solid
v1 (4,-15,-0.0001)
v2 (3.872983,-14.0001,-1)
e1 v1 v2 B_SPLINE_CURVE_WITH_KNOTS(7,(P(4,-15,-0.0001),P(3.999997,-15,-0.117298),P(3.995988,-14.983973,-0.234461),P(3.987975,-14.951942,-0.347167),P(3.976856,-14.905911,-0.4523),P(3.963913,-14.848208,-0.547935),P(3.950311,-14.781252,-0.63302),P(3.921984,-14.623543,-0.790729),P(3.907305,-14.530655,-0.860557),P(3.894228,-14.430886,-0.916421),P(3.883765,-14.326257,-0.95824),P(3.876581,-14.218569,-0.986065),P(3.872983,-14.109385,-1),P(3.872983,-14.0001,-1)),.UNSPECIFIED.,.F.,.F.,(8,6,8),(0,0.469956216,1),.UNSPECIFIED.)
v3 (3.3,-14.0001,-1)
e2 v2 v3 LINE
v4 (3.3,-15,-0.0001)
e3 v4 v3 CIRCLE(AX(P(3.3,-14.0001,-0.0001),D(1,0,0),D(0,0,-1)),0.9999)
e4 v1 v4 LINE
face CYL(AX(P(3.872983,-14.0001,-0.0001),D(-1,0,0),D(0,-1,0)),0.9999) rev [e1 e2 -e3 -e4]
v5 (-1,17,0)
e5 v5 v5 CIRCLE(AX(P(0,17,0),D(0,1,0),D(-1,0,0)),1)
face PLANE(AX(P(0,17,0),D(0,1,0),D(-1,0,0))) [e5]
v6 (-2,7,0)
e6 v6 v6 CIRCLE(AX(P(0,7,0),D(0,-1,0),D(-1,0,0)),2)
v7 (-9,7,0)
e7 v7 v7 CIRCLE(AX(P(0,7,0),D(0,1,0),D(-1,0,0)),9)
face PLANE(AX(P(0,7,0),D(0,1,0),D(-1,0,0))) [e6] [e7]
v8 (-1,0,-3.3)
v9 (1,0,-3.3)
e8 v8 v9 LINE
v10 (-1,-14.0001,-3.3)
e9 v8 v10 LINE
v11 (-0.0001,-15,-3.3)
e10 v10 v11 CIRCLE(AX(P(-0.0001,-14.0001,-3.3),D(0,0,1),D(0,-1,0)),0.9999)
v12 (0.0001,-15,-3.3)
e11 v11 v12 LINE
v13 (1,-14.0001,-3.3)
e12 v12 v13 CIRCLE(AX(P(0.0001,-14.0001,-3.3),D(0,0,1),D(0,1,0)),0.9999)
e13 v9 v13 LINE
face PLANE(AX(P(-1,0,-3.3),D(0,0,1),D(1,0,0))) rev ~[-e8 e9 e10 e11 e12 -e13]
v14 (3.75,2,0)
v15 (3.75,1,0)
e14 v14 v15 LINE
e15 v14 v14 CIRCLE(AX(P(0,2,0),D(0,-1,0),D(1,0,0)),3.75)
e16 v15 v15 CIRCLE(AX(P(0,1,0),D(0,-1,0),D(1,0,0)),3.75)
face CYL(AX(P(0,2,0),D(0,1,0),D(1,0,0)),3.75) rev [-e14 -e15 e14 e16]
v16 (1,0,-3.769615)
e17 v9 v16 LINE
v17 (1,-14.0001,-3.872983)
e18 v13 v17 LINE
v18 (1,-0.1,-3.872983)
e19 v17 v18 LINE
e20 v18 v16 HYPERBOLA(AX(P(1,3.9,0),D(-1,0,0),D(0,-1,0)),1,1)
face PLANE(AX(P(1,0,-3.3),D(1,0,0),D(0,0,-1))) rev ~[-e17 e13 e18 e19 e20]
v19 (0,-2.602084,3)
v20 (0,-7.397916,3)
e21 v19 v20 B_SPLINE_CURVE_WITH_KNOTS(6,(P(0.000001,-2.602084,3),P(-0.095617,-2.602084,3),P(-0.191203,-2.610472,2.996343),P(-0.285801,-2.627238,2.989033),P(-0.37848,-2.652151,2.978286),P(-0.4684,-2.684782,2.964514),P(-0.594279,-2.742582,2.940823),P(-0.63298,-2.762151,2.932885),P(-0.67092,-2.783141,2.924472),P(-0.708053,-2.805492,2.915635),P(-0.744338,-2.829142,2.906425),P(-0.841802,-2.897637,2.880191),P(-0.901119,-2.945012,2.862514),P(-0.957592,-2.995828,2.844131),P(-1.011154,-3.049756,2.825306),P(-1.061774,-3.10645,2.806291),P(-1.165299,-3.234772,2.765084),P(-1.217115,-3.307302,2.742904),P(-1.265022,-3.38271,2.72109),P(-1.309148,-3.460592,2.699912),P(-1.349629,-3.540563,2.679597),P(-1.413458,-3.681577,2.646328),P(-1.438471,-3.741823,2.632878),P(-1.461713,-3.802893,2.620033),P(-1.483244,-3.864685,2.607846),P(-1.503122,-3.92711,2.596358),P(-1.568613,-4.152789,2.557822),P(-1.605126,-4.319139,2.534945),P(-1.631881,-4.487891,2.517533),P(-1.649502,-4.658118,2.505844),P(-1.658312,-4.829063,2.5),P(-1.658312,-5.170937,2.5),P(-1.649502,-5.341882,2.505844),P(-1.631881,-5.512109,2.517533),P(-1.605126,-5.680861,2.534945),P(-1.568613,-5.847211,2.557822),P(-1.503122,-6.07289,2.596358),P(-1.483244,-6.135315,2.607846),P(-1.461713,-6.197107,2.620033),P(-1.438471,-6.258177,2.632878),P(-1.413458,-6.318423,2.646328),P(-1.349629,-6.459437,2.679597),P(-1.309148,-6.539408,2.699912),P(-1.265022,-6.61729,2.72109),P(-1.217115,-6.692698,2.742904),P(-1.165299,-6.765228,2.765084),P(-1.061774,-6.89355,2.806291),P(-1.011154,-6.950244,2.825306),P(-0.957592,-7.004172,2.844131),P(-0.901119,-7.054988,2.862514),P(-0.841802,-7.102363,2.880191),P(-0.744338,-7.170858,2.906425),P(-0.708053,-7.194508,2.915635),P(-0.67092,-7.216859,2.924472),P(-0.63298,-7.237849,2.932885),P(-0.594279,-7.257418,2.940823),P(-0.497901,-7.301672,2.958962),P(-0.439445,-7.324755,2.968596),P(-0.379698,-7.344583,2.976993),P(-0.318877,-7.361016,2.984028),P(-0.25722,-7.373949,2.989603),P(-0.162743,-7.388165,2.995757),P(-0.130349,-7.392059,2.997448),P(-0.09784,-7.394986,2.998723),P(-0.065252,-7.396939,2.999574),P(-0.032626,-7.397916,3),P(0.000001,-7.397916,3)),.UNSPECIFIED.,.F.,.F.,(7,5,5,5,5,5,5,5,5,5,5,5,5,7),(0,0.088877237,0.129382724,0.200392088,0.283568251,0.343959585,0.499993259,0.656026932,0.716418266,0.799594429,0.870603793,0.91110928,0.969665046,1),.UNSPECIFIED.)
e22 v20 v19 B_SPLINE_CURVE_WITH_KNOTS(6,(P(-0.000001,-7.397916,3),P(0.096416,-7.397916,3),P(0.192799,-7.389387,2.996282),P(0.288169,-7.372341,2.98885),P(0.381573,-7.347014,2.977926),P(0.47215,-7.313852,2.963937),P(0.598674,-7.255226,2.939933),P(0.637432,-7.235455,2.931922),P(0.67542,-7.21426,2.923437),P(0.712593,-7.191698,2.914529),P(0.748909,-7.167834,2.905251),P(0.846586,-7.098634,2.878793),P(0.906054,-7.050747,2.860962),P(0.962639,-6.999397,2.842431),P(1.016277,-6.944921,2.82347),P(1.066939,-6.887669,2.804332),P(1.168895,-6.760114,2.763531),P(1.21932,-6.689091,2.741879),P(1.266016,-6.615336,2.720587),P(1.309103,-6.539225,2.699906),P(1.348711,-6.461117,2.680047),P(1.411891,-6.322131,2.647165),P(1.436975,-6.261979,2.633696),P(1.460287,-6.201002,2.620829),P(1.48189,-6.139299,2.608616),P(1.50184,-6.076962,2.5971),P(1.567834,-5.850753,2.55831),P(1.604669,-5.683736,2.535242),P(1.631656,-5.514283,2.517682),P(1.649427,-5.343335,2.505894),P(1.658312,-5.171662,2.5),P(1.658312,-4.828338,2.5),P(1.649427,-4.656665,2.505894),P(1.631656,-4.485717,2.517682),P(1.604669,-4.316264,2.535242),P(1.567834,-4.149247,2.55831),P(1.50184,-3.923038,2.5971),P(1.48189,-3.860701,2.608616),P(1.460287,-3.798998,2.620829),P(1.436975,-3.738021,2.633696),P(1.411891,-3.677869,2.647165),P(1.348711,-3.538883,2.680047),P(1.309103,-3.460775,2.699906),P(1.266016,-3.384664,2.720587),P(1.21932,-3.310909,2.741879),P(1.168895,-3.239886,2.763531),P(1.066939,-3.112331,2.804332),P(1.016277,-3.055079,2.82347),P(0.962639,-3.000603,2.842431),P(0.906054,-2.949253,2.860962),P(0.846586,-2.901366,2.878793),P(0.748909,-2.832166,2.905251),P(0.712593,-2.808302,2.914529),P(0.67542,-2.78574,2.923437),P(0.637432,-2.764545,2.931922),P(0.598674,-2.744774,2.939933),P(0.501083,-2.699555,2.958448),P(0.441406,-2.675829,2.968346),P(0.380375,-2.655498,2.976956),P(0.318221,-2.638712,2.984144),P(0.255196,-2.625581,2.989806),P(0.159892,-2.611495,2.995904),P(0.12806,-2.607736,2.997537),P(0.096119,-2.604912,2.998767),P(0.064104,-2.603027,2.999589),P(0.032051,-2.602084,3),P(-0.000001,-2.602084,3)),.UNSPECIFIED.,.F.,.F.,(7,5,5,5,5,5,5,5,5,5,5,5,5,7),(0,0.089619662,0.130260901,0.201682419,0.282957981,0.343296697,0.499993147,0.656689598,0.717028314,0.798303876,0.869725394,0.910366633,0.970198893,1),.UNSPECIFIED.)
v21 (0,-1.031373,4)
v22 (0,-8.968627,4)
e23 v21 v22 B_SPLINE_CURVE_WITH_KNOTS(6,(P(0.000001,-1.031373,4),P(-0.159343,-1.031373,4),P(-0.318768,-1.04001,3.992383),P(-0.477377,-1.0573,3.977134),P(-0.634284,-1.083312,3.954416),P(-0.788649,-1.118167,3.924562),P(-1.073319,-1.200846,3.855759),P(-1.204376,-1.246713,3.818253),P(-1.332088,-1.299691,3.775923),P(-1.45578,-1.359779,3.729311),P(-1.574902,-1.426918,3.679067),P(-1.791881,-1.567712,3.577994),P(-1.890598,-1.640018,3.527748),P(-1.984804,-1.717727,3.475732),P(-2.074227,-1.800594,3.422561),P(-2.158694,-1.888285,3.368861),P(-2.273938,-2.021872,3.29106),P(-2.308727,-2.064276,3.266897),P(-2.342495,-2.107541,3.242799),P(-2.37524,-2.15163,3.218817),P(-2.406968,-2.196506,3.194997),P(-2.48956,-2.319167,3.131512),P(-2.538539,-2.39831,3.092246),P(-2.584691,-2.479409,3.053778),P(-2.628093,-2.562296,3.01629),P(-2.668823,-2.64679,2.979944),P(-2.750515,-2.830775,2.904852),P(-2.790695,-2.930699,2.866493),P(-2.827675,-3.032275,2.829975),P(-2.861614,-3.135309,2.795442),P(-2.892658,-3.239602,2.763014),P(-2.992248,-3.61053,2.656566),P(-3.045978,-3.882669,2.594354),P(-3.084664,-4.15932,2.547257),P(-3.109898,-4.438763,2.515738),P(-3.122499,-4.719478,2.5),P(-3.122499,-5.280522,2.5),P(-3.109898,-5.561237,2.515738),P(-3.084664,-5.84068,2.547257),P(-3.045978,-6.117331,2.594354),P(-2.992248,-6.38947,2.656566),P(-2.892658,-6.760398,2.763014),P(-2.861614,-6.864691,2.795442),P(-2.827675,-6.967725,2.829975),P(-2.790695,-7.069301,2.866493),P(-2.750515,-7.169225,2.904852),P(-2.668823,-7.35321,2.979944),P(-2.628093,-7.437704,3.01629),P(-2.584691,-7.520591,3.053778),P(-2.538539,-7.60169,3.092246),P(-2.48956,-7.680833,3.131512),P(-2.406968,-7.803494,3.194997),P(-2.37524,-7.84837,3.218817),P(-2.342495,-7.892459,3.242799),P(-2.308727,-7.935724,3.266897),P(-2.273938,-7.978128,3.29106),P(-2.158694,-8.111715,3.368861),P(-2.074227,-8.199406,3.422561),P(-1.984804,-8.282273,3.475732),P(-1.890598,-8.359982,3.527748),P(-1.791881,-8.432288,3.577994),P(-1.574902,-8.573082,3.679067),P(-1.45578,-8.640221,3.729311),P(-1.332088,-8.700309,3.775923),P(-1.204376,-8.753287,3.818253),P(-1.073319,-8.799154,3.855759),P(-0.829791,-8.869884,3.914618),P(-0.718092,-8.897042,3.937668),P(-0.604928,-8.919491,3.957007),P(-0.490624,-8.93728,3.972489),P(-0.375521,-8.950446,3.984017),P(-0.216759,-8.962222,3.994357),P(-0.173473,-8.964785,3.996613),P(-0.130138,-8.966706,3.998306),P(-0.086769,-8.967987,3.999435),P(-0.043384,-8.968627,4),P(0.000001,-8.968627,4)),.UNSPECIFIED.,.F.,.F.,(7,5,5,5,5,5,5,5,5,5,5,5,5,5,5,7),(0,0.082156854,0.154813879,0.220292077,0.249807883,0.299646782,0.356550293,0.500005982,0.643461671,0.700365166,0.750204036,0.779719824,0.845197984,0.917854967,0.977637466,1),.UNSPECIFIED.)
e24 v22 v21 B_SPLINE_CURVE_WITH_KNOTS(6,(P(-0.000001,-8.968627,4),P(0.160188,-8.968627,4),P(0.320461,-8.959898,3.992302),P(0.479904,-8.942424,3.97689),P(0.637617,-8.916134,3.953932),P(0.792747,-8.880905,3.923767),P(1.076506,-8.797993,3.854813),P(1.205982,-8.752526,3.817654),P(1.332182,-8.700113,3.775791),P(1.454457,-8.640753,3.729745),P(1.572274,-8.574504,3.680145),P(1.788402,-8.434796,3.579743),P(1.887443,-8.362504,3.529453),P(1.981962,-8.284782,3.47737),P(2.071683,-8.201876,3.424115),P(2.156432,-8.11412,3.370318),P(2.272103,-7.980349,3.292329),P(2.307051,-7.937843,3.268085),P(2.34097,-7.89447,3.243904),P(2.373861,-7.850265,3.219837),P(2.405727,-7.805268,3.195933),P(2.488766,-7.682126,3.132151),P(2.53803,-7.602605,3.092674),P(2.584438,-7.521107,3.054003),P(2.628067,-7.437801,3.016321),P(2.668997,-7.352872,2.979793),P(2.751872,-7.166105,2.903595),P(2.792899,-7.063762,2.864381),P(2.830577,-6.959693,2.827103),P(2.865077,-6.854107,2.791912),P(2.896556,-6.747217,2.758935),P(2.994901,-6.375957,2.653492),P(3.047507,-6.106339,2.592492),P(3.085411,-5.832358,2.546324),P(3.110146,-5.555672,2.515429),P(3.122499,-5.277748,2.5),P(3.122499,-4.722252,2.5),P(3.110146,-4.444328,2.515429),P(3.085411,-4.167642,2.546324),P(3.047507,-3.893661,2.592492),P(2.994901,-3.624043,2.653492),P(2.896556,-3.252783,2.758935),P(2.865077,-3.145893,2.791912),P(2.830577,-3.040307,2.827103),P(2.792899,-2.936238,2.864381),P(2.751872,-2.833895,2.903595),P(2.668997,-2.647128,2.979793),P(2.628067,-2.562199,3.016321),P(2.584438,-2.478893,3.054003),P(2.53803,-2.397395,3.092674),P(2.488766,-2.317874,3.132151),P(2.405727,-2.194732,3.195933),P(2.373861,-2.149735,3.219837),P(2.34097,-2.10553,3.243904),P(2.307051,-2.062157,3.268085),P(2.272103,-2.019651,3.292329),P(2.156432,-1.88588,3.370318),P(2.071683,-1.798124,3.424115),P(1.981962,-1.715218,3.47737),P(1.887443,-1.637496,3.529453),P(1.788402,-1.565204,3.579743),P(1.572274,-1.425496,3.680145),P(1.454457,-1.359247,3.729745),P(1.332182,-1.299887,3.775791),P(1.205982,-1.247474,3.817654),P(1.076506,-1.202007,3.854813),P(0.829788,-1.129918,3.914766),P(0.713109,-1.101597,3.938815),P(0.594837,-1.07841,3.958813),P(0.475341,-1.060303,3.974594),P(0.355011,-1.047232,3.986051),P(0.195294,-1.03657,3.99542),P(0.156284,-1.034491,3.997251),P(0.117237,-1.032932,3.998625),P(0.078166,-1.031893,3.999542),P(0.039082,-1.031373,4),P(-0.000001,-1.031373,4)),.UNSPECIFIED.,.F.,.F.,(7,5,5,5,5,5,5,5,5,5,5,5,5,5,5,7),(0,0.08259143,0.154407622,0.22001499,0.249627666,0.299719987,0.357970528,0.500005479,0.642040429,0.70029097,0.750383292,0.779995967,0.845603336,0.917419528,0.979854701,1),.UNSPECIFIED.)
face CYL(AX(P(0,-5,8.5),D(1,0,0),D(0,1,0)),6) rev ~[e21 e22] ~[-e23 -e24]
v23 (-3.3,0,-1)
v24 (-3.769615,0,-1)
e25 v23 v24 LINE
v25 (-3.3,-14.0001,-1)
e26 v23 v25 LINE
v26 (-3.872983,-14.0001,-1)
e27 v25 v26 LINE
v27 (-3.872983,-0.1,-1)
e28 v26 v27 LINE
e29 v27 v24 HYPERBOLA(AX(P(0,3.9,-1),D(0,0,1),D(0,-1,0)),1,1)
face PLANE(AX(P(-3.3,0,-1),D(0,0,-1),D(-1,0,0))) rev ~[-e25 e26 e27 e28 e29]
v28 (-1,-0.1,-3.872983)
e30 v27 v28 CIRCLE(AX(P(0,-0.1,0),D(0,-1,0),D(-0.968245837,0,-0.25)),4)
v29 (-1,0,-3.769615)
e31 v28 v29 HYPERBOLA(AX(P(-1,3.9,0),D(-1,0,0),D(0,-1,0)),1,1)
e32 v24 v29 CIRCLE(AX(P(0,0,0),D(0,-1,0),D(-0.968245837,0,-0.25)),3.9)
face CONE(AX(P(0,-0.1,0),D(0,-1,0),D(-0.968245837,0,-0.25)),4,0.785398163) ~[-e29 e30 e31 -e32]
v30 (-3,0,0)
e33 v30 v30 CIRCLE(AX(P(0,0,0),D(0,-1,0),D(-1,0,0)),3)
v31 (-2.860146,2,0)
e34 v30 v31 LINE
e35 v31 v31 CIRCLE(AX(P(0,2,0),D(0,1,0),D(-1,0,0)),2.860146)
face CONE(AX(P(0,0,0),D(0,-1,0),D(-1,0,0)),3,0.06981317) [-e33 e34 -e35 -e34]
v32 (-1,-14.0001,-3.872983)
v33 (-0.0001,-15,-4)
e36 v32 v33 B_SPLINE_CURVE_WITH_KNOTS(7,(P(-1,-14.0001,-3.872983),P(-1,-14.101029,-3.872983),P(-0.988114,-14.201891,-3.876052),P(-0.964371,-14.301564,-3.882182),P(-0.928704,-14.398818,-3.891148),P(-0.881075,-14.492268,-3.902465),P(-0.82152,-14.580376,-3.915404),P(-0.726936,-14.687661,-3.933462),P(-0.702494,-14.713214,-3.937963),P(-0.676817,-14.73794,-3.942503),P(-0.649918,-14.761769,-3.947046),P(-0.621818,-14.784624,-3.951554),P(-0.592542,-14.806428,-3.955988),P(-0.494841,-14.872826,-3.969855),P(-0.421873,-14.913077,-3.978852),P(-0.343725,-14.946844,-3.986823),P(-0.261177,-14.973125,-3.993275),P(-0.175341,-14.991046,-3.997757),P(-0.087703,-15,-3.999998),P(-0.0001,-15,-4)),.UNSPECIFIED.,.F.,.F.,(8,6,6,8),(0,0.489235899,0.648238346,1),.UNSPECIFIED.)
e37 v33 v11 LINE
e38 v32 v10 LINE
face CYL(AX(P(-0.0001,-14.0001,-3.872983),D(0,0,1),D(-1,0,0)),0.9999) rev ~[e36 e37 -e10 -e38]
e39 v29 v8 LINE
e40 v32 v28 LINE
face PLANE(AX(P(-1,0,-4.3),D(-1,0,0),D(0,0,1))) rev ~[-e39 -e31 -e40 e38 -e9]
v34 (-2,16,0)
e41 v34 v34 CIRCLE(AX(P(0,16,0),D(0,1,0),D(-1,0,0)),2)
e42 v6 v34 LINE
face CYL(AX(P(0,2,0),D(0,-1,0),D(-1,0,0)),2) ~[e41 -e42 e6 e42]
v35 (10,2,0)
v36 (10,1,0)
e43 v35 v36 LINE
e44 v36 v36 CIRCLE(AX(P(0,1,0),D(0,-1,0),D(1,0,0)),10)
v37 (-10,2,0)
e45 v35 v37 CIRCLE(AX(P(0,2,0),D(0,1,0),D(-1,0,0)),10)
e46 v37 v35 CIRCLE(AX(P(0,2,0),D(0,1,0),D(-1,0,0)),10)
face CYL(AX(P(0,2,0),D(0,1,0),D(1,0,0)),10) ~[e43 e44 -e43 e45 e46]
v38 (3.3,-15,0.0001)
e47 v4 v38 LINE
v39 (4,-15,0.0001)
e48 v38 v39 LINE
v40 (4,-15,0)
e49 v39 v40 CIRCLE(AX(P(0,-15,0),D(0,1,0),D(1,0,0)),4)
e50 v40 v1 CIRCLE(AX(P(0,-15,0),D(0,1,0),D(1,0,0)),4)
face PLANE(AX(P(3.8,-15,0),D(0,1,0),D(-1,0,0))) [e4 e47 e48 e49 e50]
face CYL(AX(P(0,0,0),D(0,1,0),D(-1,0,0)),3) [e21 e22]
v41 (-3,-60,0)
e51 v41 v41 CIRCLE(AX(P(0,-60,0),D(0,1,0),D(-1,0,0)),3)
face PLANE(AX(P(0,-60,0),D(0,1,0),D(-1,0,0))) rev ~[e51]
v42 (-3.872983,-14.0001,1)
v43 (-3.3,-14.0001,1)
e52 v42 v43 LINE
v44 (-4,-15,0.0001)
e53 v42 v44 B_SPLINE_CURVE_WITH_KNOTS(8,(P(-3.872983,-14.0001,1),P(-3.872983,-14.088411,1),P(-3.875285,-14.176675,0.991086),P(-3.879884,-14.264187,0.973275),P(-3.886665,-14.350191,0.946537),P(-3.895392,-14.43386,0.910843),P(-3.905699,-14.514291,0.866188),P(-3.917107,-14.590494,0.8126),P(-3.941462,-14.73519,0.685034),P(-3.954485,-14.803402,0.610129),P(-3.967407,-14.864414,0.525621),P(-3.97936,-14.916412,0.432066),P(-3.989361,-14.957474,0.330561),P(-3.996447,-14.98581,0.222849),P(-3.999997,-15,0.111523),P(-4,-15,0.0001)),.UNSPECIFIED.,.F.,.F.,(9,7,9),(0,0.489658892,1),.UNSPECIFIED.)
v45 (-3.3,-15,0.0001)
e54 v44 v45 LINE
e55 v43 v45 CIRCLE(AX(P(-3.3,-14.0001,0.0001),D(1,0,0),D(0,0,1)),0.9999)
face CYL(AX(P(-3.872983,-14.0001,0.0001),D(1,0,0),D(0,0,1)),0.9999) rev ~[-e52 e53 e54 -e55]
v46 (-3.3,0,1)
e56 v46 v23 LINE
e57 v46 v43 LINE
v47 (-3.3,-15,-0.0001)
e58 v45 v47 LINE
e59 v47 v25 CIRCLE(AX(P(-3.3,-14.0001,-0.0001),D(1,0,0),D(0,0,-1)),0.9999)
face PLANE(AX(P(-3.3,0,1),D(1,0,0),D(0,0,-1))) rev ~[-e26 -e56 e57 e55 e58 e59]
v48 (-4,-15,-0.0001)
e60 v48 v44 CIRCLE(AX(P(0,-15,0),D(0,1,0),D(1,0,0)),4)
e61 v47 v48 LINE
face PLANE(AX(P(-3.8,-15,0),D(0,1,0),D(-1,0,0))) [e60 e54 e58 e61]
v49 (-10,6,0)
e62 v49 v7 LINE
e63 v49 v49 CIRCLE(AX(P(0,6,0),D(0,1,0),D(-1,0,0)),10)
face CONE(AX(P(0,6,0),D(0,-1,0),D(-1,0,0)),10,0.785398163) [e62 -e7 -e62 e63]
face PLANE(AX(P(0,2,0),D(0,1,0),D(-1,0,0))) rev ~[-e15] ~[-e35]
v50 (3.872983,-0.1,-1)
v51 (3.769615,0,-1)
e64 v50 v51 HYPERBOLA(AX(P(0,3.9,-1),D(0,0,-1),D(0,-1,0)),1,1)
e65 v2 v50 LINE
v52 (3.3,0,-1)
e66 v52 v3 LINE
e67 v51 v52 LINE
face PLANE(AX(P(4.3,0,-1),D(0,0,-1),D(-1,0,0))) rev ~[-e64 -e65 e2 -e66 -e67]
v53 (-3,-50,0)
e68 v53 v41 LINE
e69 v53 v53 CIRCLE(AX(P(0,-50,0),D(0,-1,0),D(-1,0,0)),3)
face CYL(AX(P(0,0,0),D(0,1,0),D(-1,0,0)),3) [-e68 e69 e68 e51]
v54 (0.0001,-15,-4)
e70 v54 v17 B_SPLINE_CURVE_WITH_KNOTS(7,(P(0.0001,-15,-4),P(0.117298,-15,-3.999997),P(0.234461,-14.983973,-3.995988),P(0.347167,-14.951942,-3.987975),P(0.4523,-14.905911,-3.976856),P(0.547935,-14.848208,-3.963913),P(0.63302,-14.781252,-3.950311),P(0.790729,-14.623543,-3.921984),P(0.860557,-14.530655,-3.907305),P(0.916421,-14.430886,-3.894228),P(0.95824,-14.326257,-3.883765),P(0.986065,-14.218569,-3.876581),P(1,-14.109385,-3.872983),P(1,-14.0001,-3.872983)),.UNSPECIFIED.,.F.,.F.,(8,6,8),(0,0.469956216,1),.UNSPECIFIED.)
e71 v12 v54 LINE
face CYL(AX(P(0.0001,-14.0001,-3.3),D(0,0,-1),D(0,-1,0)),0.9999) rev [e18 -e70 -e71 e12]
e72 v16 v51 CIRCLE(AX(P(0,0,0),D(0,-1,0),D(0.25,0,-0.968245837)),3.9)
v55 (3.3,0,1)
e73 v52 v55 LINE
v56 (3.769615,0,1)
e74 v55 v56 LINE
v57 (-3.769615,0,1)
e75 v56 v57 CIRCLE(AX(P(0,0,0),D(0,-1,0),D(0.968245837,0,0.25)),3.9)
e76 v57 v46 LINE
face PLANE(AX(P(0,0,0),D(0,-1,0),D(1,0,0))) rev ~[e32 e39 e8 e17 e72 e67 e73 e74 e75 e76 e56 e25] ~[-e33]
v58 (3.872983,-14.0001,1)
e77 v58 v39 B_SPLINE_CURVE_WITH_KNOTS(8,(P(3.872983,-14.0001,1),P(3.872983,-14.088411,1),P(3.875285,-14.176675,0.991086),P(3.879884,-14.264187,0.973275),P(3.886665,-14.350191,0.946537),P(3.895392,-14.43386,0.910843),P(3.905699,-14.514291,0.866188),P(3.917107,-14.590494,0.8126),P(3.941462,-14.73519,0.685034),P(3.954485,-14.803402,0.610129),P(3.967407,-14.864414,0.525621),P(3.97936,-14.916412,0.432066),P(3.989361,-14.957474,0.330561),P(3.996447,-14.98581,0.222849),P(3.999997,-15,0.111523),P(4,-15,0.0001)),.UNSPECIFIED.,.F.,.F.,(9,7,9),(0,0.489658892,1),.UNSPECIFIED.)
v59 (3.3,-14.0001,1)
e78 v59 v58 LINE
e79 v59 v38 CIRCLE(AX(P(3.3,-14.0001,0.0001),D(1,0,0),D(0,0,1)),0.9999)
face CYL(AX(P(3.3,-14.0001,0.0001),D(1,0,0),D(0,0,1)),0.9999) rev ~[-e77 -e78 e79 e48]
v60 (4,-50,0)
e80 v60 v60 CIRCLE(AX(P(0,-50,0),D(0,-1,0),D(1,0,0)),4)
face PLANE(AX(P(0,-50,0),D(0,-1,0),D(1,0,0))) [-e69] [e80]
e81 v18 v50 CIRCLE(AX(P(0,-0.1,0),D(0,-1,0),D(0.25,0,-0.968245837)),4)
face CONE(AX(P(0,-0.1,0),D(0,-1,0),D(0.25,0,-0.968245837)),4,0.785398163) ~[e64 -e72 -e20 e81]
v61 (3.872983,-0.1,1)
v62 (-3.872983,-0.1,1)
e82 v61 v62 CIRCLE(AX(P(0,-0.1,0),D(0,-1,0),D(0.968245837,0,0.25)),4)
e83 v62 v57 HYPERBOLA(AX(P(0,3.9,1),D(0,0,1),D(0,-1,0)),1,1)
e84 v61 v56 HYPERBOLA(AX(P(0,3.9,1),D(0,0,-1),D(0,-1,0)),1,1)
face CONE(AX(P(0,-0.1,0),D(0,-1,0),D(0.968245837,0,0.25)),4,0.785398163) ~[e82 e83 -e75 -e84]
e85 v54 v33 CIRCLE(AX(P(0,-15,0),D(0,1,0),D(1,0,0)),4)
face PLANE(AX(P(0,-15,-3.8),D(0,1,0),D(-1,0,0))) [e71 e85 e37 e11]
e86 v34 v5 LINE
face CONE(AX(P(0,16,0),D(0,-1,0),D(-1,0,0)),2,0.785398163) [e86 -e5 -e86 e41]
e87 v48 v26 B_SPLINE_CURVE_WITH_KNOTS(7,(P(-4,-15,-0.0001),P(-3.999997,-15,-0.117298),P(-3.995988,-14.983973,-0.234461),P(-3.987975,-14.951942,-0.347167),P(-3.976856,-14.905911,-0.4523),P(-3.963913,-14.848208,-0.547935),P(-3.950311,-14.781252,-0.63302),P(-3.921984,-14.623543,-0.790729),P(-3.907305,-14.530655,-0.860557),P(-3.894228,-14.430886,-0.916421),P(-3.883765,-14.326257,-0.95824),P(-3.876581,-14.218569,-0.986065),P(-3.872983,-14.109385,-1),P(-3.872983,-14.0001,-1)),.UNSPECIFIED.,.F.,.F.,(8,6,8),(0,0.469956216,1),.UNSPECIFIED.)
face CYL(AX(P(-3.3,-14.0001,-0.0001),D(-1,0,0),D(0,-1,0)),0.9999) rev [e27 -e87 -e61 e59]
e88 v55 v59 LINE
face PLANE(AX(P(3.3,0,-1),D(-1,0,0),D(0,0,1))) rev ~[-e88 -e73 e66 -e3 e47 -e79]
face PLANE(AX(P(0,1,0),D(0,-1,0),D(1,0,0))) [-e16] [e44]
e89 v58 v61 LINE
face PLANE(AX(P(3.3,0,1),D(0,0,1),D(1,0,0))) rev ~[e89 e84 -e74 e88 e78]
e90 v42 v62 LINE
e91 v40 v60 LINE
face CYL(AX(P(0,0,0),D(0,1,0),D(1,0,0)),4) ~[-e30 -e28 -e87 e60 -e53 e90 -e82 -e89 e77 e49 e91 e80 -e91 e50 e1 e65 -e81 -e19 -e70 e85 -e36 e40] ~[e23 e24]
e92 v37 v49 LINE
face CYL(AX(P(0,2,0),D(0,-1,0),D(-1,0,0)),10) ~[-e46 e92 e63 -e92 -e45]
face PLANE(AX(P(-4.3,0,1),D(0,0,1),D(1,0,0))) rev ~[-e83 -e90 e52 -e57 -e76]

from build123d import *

# Parameters (mm, degrees)
F0_R          = 4
F0_R_2        = 3
F1_DEPTH      = 50
F2_R          = 6
F3_DEPTH      = 25
F3_DEPTH_BACK = 25
F5_DEPTH      = 15
F6_SIZE       = 0.1
F7_R          = 0.9999
F8_R          = 3
F9_DEPTH      = 2
F9_DEPTH_BACK = 60
F12_R         = 2
F13_DEPTH     = 15
F14_SIZE      = 1
F15_R         = 10
F16_DEPTH     = 5
F17_R         = 10
F17_R_2       = 3.75
F18_DEPTH     = 1
F20_SIZE      = 1


# Not quite as in the source:
# - a fillet or chamfer that OpenCascade refuses, or shapes differently, is made with other operations: its cross-section is extruded or revolved along the edge and cut away or added
# - a fillet or chamfer is up to 0.001 mm smaller than in the source, because OpenCascade refuses the exact size


with BuildPart() as f1:
    # F0 (on Front) → F1 (new body)
    with BuildSketch(Plane.XZ):
        Circle(F0_R)
        Circle(F0_R_2, mode=Mode.SUBTRACT)
    extrude(amount=F1_DEPTH)

    # F2 (on Right) → F3 (cut, two sides)
    with BuildSketch(Plane.YZ) as f3_sk:
        with Locations((-5, 8.5)):
            Circle(F2_R)
    extrude(amount=-F3_DEPTH, mode=Mode.SUBTRACT)
    extrude(f3_sk.sketch, amount=F3_DEPTH_BACK, mode=Mode.SUBTRACT)

    # F4 (on face) → F5 (cut)
    with BuildSketch(Plane(origin=(0, 0, 0), x_dir=(-1, 0, 0), z_dir=(0, 1, 0))):
        Polygon((-4.3, 1), (-4.3, 0), (-4.3, -1), (-3.3, -1), (-3.3, 1), align=None)
        Polygon((1, -3.3), (-1, -3.3), (-1, -4.3), (0, -4.3), (1, -4.3), align=None)
        Polygon((3.3, 1), (3.3, -1), (4.3, -1), (4.3, 0), (4.3, 1), align=None)
    extrude(amount=-F5_DEPTH, mode=Mode.SUBTRACT)

    # F6
    f6_edges = [f1.edges().sort_by_distance(p)[0] for p in [
        (0, 0, 4),
        (2.828427, 0, -2.828427),
        (-2.828427, 0, -2.828427),
    ]]
    chamfer(f6_edges, length=F6_SIZE)

    # F7 (radius 1 in the source; OpenCascade refuses exactly that, so slightly less here)
    f7_edges = [f1.edges().sort_by_distance(p)[0] for p in [
        (3.586492, -15, 1),
        (3.586492, -15, -1),
        (1, -15, -3.586492),
        (-1, -15, -3.586492),
        (-3.586492, -15, -1),
        (-3.586492, -15, 1),
    ]]
    fillet(f7_edges, radius=F7_R)

    # F8 (on face) → F9 (join, two sides)
    with BuildSketch(Plane(origin=(0, 0, 0), x_dir=(-1, 0, 0), z_dir=(0, 1, 0))) as f9_sk:
        Circle(F8_R)
    extrude(amount=F9_DEPTH)
    extrude(f9_sk.sketch, amount=-F9_DEPTH_BACK)

    # F10: chamfer of 2 x 0.1398536239 on 1 edges, made by hand


with BuildPart() as f10_tool2:
    # F10_s3 → F10_t4 (revolve)
    with BuildSketch(Plane.XY):
        Polygon((-3, 0), (-2.8601463761, 2), (-3, 2), align=None)
    revolve(axis=Axis((0, 2, 0), (0, 1, 0)))

    split(bisect_by=Plane.XZ, keep=Keep.BOTTOM)


with BuildPart() as f1_1:
    add(f1.part)

    # F10_t1: cut F10_tool2
    add(f10_tool2.part, mode=Mode.SUBTRACT)

    # F12 (on face) → F13 (join)
    with BuildSketch(Plane(origin=(0, 2, 0), x_dir=(-1, 0, 0), z_dir=(0, 1, 0))):
        Circle(F12_R)
    extrude(amount=F13_DEPTH)

    # F14
    f14_edges = [f1_1.edges().sort_by_distance(p)[0] for p in [
        (2, 17, 0),
    ]]
    chamfer(f14_edges, length=F14_SIZE)

    # F15 (on face) → F16 (join)
    with BuildSketch(Plane(origin=(0, 2, 0), x_dir=(-1, 0, 0), z_dir=(0, 1, 0))):
        Circle(F15_R)
    extrude(amount=F16_DEPTH)

    # F17 (on face) → F18 (join)
    with BuildSketch(Plane.XZ.offset(-2)):
        Circle(F17_R)
        Circle(F17_R_2, mode=Mode.SUBTRACT)
    extrude(amount=F18_DEPTH)

    # F20
    f20_edges = [f1_1.edges().sort_by_distance(p)[0] for p in [
        (10, 7, 0),
    ]]
    chamfer(f20_edges, length=F20_SIZE)


solid = f1_1.part
